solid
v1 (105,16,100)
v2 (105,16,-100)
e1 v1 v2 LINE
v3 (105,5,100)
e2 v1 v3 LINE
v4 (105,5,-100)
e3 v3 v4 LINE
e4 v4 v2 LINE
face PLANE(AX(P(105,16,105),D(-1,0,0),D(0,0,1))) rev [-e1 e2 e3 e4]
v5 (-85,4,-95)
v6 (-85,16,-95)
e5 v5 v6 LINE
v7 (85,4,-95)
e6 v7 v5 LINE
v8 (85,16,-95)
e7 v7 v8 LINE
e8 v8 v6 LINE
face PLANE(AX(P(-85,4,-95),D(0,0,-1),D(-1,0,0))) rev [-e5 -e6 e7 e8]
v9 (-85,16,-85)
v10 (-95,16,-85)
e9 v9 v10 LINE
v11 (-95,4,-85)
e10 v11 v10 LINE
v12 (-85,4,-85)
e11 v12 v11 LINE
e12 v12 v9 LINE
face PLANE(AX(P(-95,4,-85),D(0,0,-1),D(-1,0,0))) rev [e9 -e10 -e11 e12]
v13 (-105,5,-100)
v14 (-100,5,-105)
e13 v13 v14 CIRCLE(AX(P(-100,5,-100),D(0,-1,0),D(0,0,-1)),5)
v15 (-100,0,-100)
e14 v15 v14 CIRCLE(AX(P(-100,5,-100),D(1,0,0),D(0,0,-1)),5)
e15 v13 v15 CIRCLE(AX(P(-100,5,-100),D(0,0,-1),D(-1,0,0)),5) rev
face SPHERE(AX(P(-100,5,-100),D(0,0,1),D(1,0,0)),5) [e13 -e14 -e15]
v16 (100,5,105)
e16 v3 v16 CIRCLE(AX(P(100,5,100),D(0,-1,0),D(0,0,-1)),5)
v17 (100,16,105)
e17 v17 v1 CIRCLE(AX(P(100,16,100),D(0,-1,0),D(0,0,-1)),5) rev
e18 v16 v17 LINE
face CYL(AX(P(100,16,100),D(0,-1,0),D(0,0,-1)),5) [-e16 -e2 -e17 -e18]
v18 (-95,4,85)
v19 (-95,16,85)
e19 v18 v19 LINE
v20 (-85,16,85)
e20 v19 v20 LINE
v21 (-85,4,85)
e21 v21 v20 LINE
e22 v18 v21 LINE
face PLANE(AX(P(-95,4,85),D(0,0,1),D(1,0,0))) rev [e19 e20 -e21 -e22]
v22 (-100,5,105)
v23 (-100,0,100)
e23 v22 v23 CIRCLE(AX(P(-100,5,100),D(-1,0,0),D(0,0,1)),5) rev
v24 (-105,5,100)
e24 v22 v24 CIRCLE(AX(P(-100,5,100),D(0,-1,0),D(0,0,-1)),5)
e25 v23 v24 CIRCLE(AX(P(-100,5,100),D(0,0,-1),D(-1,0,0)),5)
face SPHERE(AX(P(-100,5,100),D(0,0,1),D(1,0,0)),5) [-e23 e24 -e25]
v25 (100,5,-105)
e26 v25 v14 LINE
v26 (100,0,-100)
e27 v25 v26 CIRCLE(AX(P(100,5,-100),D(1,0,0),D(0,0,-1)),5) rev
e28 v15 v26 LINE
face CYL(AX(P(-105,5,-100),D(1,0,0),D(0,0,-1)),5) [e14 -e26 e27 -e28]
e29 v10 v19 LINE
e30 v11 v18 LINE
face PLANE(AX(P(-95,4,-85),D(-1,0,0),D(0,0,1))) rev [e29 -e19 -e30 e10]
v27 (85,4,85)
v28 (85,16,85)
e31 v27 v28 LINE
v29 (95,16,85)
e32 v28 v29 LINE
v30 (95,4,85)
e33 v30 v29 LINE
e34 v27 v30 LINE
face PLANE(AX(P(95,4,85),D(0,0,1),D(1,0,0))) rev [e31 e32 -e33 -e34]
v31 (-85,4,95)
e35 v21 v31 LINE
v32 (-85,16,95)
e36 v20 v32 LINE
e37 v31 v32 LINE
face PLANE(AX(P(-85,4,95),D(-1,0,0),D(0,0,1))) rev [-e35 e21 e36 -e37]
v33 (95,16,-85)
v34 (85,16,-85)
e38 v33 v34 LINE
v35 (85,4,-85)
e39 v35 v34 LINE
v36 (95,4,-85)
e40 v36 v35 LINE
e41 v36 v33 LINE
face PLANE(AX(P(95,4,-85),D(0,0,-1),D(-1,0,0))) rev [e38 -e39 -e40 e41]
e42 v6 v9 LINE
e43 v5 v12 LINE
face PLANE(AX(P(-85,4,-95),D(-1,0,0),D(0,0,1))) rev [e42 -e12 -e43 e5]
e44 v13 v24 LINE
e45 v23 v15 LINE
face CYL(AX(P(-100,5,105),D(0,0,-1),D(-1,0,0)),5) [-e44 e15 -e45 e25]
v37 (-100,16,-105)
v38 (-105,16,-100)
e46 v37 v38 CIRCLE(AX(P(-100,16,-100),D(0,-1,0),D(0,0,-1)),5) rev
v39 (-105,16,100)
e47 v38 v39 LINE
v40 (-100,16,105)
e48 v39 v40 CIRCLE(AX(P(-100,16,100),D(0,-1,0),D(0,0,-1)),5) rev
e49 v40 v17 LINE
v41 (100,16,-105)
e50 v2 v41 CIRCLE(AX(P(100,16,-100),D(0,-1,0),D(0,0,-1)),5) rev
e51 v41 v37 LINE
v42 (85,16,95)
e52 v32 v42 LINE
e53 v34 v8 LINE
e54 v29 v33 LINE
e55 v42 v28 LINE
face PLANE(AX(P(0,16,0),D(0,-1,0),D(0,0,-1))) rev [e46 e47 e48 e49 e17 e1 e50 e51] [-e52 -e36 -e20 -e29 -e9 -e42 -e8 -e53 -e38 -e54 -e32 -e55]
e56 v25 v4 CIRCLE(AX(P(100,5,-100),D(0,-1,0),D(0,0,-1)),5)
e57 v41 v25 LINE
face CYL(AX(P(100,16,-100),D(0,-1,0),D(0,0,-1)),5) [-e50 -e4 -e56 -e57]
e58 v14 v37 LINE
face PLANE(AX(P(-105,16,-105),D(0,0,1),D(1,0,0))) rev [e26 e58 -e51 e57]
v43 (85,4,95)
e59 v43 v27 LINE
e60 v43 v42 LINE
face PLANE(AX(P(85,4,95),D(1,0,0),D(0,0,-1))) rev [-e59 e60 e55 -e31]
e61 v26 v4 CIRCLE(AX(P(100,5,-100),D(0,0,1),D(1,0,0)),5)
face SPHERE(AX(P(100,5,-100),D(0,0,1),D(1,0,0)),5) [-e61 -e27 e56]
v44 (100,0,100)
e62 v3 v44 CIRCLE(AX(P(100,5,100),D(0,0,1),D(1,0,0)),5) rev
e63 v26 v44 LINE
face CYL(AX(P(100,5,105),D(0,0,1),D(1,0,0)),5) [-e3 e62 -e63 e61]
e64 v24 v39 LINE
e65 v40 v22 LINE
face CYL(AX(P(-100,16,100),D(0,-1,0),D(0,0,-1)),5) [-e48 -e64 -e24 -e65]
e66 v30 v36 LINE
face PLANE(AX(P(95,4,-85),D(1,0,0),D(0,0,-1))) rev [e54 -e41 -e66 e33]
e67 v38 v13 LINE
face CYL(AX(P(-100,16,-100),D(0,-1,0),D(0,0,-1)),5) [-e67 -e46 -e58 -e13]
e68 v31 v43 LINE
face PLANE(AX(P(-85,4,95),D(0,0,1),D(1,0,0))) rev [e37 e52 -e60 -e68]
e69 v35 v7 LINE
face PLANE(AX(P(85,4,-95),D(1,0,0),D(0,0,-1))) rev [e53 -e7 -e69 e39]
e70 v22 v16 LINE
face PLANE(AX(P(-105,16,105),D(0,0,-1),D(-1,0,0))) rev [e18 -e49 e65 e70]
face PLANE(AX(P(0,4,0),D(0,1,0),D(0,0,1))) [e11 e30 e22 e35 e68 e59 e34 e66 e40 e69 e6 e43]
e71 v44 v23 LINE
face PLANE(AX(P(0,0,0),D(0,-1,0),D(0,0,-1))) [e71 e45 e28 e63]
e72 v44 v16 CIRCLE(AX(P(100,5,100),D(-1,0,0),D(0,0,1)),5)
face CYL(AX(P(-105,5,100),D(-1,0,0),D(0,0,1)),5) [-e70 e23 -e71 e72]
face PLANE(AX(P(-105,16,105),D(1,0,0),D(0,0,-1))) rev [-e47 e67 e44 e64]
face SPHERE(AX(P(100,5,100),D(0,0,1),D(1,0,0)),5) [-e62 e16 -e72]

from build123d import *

# Parameters (mm, degrees)
SKETCH1_W          = 210
SKETCH1_H          = 210
BASE_DEPTH         = 16
CUT_EXTRUDE1_DEPTH = 12
FILLET1_R          = 5
FILLET2_R          = 5


with BuildPart() as part:
    # Sketch1 → Base (new body)
    with BuildSketch(Plane(origin=(0, 0, 0), x_dir=(1, 0, 0), z_dir=(0, 1, 0))):
        Rectangle(SKETCH1_W, SKETCH1_H)
    extrude(amount=BASE_DEPTH)

    # Sketch3 → Cut-Extrude1 (cut)
    with BuildSketch(Plane(origin=(0, 16, 0), x_dir=(1, 0, 0), z_dir=(0, 1, 0))):
        Polygon((-85, 95), (85, 95), (85, 85), (95, 85), (95, -85), (85, -85), (85, -95), (-85, -95), (-85, -85), (-95, -85), (-95, 85), (-85, 85), align=None)
    extrude(amount=-CUT_EXTRUDE1_DEPTH, mode=Mode.SUBTRACT)

    # Fillet1
    fillet1_edges = [part.edges().sort_by_distance(p)[0] for p in [
        (0, 0, 105),
        (-105, 0, 0),
        (0, 0, -105),
        (105, 0, 0),
    ]]
    fillet(fillet1_edges, radius=FILLET1_R)

    # Fillet2
    # the kernel refuses this fillet: 5 mm, written as the material it takes off along each edge
    with BuildSketch(Plane(origin=(100, 5, 100), x_dir=(1, 0, 0), z_dir=(0, 0, 1))) as fillet2_piece_1_section:
        Polygon((0, 0), (FILLET2_R, 0), (FILLET2_R, -FILLET2_R), (0, -FILLET2_R), align=None)
    fillet2_piece_1 = extrude(amount=FILLET2_R, mode=Mode.PRIVATE)
    fillet2_piece_1 = fillet2_piece_1 - Plane(origin=(100, 5, 100), x_dir=(-0.7071067811865475, 0.7071067811865475, 0), z_dir=(0, 0, 1)) * Sphere(FILLET2_R, mode=Mode.PRIVATE)
    add(fillet2_piece_1, mode=Mode.SUBTRACT)
    with BuildSketch(Plane(origin=(-100, 5, 100), x_dir=(-1, 0, 0), z_dir=(0, 0, 1))) as fillet2_piece_2_section:
        Polygon((0, 0), (FILLET2_R, 0), (FILLET2_R, FILLET2_R), (0, FILLET2_R), align=None)
    fillet2_piece_2 = extrude(amount=FILLET2_R, mode=Mode.PRIVATE)
    fillet2_piece_2 = fillet2_piece_2 - Plane(origin=(-100, 5, 100), x_dir=(0.7071067811865475, 0.7071067811865475, 0), z_dir=(0, 0, 1)) * Sphere(FILLET2_R, mode=Mode.PRIVATE)
    add(fillet2_piece_2, mode=Mode.SUBTRACT)
    with BuildSketch(Plane(origin=(100, 5, -100), x_dir=(0, 0, -1), z_dir=(1, 0, 0))) as fillet2_piece_3_section:
        Polygon((0, 0), (FILLET2_R, 0), (FILLET2_R, -FILLET2_R), (0, -FILLET2_R), align=None)
    fillet2_piece_3 = extrude(amount=FILLET2_R, mode=Mode.PRIVATE)
    fillet2_piece_3 = fillet2_piece_3 - Plane(origin=(100, 5, -100), x_dir=(0, 0.7071067811865475, 0.7071067811865475), z_dir=(1, 0, 0)) * Sphere(FILLET2_R, mode=Mode.PRIVATE)
    add(fillet2_piece_3, mode=Mode.SUBTRACT)
    with BuildSketch(Plane(origin=(-100, 5, -100), x_dir=(0, 0, -1), z_dir=(-1, 0, 0))) as fillet2_piece_4_section:
        Polygon((0, 0), (FILLET2_R, 0), (FILLET2_R, FILLET2_R), (0, FILLET2_R), align=None)
    fillet2_piece_4 = extrude(amount=FILLET2_R, mode=Mode.PRIVATE)
    fillet2_piece_4 = fillet2_piece_4 - Plane(origin=(-100, 5, -100), x_dir=(0, 0.7071067811865475, 0.7071067811865475), z_dir=(-1, 0, 0)) * Sphere(FILLET2_R, mode=Mode.PRIVATE)
    add(fillet2_piece_4, mode=Mode.SUBTRACT)
    with BuildSketch(Plane(origin=(105, 5, 105), x_dir=(-1, 0, 0), z_dir=(0, 1, 0)), Plane(origin=(105, 5, -105), x_dir=(0, 0, 1), z_dir=(0, 1, 0))) as fillet2_piece_5:
        with BuildLine():
            CenterArc((FILLET2_R, -FILLET2_R), FILLET2_R, 90, 90)
            Line((0, -FILLET2_R), (0, 0))
            Line((0, 0), (FILLET2_R, 0))
        make_face()
    extrude(amount=23.5, mode=Mode.SUBTRACT)
    with BuildSketch(Plane(origin=(-105, 5, 105), x_dir=(1, 0, 0), z_dir=(0, 1, 0)), Plane(origin=(-105, 5, -105), x_dir=(0, 0, 1), z_dir=(0, 1, 0))) as fillet2_piece_6:
        with BuildLine():
            CenterArc((FILLET2_R, FILLET2_R), FILLET2_R, 180, 90)
            Line((0, FILLET2_R), (0, 0))
            Line((0, 0), (FILLET2_R, 0))
        make_face()
    extrude(amount=23.5, mode=Mode.SUBTRACT)


solid = part.part
